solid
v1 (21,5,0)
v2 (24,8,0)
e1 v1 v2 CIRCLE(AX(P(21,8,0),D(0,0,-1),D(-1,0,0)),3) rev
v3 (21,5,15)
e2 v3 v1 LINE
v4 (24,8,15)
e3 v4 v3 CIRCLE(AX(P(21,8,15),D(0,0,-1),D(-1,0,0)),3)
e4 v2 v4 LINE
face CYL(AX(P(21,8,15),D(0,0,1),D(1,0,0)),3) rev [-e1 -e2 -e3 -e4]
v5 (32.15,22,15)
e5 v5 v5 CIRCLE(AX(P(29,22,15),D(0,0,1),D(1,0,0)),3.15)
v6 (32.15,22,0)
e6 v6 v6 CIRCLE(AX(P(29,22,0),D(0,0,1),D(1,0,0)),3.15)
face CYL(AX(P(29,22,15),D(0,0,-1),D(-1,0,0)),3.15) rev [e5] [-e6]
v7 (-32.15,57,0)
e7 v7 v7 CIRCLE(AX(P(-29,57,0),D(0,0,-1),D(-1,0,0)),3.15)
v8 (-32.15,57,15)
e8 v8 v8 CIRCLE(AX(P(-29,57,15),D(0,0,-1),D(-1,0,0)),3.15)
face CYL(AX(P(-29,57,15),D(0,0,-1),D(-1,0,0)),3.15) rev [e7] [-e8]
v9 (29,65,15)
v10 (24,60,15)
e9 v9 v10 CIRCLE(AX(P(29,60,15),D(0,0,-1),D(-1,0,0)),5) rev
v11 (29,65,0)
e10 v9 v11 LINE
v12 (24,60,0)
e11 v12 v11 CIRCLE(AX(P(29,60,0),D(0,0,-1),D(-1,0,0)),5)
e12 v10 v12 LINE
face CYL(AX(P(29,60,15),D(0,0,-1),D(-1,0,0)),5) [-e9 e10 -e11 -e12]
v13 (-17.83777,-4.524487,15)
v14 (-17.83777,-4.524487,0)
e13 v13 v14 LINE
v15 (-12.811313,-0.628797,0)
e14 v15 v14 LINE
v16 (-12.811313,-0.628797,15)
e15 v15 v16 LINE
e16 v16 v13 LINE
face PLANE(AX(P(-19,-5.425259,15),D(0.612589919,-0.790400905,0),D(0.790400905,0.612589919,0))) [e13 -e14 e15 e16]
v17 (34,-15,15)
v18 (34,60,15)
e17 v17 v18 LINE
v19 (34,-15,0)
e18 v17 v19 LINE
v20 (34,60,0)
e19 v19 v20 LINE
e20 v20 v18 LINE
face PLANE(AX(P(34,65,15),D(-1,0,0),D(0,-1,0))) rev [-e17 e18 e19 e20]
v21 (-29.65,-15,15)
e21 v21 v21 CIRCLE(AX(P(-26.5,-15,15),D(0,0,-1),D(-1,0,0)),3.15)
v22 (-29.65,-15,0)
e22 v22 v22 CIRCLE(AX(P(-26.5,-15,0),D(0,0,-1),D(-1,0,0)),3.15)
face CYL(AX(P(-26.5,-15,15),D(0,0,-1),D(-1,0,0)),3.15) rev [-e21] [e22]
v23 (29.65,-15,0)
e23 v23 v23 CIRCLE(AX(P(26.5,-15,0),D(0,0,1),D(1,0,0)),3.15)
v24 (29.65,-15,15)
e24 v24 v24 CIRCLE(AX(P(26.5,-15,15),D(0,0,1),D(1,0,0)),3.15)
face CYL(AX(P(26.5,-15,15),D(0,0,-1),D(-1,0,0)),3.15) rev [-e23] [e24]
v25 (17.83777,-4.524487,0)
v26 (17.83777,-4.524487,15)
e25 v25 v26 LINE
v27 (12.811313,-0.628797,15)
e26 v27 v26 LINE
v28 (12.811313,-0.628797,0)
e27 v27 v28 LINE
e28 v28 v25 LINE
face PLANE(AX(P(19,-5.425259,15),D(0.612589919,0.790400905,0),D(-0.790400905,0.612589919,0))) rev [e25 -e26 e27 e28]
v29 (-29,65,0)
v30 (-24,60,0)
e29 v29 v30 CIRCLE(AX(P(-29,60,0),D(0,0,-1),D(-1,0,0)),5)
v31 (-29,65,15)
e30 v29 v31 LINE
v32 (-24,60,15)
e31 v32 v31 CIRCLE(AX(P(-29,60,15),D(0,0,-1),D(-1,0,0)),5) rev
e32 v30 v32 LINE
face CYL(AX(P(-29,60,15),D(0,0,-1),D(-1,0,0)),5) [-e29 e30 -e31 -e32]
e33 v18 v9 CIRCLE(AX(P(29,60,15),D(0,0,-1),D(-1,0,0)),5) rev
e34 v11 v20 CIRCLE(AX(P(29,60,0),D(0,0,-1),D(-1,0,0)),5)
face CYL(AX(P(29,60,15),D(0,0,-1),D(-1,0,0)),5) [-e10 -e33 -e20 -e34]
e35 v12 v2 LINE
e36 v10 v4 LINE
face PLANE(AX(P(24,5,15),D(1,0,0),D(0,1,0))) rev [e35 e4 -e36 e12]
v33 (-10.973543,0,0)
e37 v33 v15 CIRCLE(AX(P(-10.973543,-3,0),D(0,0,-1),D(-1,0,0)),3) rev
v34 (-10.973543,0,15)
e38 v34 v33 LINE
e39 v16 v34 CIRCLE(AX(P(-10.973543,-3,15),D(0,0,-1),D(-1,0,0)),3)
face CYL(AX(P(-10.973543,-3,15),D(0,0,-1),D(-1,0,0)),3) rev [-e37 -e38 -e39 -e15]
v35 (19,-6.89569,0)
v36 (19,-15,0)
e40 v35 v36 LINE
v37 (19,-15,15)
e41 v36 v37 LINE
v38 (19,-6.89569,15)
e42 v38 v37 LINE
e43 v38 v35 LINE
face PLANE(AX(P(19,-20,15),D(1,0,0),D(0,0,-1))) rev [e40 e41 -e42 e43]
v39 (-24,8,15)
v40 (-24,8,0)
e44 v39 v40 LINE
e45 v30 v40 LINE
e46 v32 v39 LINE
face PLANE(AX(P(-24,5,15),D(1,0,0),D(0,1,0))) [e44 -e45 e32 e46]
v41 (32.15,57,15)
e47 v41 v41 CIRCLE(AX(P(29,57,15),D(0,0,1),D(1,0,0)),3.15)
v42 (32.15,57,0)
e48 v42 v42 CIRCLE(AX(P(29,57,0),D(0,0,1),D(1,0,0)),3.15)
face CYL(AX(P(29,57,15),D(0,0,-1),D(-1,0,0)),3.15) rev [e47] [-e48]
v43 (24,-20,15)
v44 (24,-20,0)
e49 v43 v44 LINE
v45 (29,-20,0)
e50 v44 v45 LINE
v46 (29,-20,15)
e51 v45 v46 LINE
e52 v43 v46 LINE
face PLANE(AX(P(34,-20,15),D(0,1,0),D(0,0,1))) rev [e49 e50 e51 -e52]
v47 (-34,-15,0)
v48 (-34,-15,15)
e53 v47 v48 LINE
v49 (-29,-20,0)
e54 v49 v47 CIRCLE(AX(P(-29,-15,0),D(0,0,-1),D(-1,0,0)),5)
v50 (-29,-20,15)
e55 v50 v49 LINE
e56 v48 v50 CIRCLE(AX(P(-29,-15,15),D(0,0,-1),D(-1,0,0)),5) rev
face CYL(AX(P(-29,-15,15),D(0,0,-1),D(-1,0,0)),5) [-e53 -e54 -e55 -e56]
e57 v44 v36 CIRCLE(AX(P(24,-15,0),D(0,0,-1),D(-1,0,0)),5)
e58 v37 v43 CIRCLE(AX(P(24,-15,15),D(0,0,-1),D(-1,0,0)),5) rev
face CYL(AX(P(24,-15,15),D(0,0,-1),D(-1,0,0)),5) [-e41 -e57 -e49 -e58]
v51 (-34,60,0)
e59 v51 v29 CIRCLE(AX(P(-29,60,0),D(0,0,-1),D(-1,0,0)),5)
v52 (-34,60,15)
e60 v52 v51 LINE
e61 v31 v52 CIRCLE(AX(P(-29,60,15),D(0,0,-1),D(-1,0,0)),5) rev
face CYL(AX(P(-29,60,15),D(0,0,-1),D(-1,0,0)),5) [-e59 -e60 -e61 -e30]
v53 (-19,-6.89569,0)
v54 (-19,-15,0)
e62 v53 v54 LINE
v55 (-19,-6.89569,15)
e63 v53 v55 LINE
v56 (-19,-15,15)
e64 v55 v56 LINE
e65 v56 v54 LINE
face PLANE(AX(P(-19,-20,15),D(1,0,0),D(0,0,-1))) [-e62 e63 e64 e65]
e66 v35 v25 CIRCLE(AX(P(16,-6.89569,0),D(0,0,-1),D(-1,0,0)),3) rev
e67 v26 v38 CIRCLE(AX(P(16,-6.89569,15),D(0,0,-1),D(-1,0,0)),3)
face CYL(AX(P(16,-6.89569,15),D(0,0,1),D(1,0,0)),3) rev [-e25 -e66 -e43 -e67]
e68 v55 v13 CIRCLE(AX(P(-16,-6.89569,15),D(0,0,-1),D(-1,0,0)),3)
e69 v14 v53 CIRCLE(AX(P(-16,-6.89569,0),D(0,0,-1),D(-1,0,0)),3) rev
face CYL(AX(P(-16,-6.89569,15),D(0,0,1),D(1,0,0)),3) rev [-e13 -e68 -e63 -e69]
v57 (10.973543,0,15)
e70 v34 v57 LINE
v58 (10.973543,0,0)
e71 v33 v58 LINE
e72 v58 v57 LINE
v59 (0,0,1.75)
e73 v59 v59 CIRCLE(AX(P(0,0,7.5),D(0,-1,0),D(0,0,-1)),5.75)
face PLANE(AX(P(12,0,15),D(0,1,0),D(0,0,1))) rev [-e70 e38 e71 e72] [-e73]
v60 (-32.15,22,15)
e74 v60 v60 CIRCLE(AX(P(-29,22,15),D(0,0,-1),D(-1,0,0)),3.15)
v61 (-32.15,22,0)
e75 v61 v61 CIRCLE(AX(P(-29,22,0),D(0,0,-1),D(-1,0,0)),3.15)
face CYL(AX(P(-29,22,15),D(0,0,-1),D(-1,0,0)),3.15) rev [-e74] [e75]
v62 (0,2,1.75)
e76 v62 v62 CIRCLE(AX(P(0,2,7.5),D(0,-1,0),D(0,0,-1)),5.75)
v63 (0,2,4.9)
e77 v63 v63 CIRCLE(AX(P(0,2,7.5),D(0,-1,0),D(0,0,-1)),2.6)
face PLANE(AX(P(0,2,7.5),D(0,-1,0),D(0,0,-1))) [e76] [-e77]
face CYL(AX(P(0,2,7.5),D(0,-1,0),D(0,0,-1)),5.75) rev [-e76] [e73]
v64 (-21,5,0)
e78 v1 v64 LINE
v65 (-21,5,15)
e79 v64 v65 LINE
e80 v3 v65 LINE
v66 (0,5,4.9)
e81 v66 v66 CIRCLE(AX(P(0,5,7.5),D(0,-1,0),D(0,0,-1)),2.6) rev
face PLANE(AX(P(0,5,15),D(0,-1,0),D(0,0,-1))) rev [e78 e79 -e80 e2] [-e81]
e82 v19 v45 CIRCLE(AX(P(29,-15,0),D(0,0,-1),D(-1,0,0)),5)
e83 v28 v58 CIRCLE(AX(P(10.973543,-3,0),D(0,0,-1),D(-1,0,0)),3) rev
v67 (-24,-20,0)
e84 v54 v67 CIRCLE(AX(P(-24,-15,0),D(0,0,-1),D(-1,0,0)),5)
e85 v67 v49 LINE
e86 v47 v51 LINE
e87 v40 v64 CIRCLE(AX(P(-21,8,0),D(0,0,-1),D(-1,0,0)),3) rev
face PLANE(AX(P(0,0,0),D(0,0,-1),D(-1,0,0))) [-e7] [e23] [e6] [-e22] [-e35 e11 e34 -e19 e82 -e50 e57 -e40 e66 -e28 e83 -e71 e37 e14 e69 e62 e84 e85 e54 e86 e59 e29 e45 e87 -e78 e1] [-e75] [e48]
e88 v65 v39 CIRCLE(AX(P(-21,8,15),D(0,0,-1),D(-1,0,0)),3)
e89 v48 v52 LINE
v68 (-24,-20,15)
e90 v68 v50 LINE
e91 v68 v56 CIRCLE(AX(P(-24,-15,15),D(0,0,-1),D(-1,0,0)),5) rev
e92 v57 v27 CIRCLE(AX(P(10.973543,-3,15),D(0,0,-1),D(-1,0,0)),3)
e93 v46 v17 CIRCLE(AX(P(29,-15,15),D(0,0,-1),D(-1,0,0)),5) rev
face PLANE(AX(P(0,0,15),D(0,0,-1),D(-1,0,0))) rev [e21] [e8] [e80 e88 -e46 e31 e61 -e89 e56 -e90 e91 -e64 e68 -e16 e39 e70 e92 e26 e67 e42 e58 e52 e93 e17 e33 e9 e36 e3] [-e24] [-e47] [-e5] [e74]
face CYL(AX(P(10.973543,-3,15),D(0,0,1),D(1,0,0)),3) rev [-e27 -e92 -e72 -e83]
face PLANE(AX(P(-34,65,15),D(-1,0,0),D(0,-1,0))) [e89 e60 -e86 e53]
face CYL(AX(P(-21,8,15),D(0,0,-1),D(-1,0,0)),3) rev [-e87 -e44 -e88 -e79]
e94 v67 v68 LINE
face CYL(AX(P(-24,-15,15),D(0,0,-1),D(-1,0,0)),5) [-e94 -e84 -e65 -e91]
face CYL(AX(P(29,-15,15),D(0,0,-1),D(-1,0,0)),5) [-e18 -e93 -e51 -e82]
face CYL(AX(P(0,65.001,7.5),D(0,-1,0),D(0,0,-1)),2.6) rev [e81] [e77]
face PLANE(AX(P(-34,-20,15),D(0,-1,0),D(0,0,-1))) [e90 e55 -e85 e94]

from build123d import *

# Parameters (mm, degrees)
ESQUISSE1_R             = 3.15
BOSS_EXTRU_1_DEPTH      = 15
CONG_1_R                = 3
CONG_2_R                = 5
CONG_1_OF_SYM_TRIE2_R   = 3
CONG_2_OF_SYM_TRIE2_R   = 5
ESQUISSE3_R             = 5.75
ENL_V_MAT_EXTRU_1_DEPTH = 2
ENL_V_MAT_EXTRU_2_REACH = 75.144
ESQUISSE4_R             = 2.6


with BuildPart() as part:
    # Esquisse1 → Boss.-Extru.1 (new body)
    with BuildSketch(Plane.XY):
        Polygon((0, 0), (0, 5), (24, 5), (24, 65), (34, 65), (34, -20), (19, -20), (19, -5.425258757), (12, 0), align=None)
        with Locations((29, 57)):
            Circle(ESQUISSE1_R, mode=Mode.SUBTRACT)
        with Locations((26.5, -15)):
            Circle(ESQUISSE1_R, mode=Mode.SUBTRACT)
        with Locations((29, 22)):
            Circle(ESQUISSE1_R, mode=Mode.SUBTRACT)
    boss_extru_1 = extrude(amount=BOSS_EXTRU_1_DEPTH)

    # Congé1
    cong_1_edges = [part.edges().sort_by_distance(p)[0] for p in [
        (24, 5, 7.5),
        (19, -5.425258757, 7.5),
        (12, 0, 7.5),
    ]]
    fillet(cong_1_edges, radius=CONG_1_R)

    # Congé2
    cong_2_edges = [part.edges().sort_by_distance(p)[0] for p in [
        (19, -20, 7.5),
        (34, -20, 7.5),
        (24, 65, 7.5),
        (34, 65, 7.5),
    ]]
    fillet(cong_2_edges, radius=CONG_2_R - 0.0001)  # a hair under: the kernel refuses the full size

    # Symétrie2: Boss.-Extru.1 across plane
    add(boss_extru_1.mirror(Plane(origin=(0, 0, 15), x_dir=(0, 0, 1), z_dir=(1, 0, 0))))

    # Congé1 of Symétrie2
    cong_1_of_sym_trie2_edges = [part.edges().sort_by_distance(p)[0] for p in [
        (-24, 5, 7.5),
        (-19, -5.425258757, 7.5),
        (-12, 0, 7.5),
    ]]
    fillet(cong_1_of_sym_trie2_edges, radius=CONG_1_OF_SYM_TRIE2_R)

    # Congé2 of Symétrie2
    cong_2_of_sym_trie2_edges = [part.edges().sort_by_distance(p)[0] for p in [
        (-19, -20, 7.5),
        (-34, -20, 7.5),
        (-24, 65, 7.5),
        (-34, 65, 7.5),
    ]]
    fillet(cong_2_of_sym_trie2_edges, radius=CONG_2_OF_SYM_TRIE2_R - 0.0001)  # a hair under: the kernel refuses the full size

    # Esquisse3 → Enlèv. mat.-Extru.1 (cut)
    with BuildSketch(Plane.XZ):
        with Locations(Location((0, 7.5, 0), (0, 0, 270))):
            Circle(ESQUISSE3_R)
    extrude(amount=-ENL_V_MAT_EXTRU_1_DEPTH, mode=Mode.SUBTRACT)

    # Esquisse4 → Enlèv. mat.-Extru.2 (cut, up to next)
    with BuildSketch(Plane.XZ.offset(-2), mode=Mode.PRIVATE) as enl_v_mat_extru_2_sk1:
        with Locations(Location((0, 7.5, 0), (0, 0, 270))):
            Circle(ESQUISSE4_R)
    enl_v_mat_extru_2_tool1 = extrude(enl_v_mat_extru_2_sk1.sketch, amount=-ENL_V_MAT_EXTRU_2_REACH, mode=Mode.PRIVATE) & part.part
    enl_v_mat_extru_2 = enl_v_mat_extru_2_tool1.solids().sort_by_distance((0, 2, 7.5))[0]
    add(enl_v_mat_extru_2, mode=Mode.SUBTRACT)

    # Symétrie1: Enlèv. mat.-Extru.2 across Right Plane
    add(enl_v_mat_extru_2.mirror(Plane(origin=(0, 0, 0), x_dir=(0, 0, -1), z_dir=(1, 0, 0))), mode=Mode.SUBTRACT)


solid = part.part
